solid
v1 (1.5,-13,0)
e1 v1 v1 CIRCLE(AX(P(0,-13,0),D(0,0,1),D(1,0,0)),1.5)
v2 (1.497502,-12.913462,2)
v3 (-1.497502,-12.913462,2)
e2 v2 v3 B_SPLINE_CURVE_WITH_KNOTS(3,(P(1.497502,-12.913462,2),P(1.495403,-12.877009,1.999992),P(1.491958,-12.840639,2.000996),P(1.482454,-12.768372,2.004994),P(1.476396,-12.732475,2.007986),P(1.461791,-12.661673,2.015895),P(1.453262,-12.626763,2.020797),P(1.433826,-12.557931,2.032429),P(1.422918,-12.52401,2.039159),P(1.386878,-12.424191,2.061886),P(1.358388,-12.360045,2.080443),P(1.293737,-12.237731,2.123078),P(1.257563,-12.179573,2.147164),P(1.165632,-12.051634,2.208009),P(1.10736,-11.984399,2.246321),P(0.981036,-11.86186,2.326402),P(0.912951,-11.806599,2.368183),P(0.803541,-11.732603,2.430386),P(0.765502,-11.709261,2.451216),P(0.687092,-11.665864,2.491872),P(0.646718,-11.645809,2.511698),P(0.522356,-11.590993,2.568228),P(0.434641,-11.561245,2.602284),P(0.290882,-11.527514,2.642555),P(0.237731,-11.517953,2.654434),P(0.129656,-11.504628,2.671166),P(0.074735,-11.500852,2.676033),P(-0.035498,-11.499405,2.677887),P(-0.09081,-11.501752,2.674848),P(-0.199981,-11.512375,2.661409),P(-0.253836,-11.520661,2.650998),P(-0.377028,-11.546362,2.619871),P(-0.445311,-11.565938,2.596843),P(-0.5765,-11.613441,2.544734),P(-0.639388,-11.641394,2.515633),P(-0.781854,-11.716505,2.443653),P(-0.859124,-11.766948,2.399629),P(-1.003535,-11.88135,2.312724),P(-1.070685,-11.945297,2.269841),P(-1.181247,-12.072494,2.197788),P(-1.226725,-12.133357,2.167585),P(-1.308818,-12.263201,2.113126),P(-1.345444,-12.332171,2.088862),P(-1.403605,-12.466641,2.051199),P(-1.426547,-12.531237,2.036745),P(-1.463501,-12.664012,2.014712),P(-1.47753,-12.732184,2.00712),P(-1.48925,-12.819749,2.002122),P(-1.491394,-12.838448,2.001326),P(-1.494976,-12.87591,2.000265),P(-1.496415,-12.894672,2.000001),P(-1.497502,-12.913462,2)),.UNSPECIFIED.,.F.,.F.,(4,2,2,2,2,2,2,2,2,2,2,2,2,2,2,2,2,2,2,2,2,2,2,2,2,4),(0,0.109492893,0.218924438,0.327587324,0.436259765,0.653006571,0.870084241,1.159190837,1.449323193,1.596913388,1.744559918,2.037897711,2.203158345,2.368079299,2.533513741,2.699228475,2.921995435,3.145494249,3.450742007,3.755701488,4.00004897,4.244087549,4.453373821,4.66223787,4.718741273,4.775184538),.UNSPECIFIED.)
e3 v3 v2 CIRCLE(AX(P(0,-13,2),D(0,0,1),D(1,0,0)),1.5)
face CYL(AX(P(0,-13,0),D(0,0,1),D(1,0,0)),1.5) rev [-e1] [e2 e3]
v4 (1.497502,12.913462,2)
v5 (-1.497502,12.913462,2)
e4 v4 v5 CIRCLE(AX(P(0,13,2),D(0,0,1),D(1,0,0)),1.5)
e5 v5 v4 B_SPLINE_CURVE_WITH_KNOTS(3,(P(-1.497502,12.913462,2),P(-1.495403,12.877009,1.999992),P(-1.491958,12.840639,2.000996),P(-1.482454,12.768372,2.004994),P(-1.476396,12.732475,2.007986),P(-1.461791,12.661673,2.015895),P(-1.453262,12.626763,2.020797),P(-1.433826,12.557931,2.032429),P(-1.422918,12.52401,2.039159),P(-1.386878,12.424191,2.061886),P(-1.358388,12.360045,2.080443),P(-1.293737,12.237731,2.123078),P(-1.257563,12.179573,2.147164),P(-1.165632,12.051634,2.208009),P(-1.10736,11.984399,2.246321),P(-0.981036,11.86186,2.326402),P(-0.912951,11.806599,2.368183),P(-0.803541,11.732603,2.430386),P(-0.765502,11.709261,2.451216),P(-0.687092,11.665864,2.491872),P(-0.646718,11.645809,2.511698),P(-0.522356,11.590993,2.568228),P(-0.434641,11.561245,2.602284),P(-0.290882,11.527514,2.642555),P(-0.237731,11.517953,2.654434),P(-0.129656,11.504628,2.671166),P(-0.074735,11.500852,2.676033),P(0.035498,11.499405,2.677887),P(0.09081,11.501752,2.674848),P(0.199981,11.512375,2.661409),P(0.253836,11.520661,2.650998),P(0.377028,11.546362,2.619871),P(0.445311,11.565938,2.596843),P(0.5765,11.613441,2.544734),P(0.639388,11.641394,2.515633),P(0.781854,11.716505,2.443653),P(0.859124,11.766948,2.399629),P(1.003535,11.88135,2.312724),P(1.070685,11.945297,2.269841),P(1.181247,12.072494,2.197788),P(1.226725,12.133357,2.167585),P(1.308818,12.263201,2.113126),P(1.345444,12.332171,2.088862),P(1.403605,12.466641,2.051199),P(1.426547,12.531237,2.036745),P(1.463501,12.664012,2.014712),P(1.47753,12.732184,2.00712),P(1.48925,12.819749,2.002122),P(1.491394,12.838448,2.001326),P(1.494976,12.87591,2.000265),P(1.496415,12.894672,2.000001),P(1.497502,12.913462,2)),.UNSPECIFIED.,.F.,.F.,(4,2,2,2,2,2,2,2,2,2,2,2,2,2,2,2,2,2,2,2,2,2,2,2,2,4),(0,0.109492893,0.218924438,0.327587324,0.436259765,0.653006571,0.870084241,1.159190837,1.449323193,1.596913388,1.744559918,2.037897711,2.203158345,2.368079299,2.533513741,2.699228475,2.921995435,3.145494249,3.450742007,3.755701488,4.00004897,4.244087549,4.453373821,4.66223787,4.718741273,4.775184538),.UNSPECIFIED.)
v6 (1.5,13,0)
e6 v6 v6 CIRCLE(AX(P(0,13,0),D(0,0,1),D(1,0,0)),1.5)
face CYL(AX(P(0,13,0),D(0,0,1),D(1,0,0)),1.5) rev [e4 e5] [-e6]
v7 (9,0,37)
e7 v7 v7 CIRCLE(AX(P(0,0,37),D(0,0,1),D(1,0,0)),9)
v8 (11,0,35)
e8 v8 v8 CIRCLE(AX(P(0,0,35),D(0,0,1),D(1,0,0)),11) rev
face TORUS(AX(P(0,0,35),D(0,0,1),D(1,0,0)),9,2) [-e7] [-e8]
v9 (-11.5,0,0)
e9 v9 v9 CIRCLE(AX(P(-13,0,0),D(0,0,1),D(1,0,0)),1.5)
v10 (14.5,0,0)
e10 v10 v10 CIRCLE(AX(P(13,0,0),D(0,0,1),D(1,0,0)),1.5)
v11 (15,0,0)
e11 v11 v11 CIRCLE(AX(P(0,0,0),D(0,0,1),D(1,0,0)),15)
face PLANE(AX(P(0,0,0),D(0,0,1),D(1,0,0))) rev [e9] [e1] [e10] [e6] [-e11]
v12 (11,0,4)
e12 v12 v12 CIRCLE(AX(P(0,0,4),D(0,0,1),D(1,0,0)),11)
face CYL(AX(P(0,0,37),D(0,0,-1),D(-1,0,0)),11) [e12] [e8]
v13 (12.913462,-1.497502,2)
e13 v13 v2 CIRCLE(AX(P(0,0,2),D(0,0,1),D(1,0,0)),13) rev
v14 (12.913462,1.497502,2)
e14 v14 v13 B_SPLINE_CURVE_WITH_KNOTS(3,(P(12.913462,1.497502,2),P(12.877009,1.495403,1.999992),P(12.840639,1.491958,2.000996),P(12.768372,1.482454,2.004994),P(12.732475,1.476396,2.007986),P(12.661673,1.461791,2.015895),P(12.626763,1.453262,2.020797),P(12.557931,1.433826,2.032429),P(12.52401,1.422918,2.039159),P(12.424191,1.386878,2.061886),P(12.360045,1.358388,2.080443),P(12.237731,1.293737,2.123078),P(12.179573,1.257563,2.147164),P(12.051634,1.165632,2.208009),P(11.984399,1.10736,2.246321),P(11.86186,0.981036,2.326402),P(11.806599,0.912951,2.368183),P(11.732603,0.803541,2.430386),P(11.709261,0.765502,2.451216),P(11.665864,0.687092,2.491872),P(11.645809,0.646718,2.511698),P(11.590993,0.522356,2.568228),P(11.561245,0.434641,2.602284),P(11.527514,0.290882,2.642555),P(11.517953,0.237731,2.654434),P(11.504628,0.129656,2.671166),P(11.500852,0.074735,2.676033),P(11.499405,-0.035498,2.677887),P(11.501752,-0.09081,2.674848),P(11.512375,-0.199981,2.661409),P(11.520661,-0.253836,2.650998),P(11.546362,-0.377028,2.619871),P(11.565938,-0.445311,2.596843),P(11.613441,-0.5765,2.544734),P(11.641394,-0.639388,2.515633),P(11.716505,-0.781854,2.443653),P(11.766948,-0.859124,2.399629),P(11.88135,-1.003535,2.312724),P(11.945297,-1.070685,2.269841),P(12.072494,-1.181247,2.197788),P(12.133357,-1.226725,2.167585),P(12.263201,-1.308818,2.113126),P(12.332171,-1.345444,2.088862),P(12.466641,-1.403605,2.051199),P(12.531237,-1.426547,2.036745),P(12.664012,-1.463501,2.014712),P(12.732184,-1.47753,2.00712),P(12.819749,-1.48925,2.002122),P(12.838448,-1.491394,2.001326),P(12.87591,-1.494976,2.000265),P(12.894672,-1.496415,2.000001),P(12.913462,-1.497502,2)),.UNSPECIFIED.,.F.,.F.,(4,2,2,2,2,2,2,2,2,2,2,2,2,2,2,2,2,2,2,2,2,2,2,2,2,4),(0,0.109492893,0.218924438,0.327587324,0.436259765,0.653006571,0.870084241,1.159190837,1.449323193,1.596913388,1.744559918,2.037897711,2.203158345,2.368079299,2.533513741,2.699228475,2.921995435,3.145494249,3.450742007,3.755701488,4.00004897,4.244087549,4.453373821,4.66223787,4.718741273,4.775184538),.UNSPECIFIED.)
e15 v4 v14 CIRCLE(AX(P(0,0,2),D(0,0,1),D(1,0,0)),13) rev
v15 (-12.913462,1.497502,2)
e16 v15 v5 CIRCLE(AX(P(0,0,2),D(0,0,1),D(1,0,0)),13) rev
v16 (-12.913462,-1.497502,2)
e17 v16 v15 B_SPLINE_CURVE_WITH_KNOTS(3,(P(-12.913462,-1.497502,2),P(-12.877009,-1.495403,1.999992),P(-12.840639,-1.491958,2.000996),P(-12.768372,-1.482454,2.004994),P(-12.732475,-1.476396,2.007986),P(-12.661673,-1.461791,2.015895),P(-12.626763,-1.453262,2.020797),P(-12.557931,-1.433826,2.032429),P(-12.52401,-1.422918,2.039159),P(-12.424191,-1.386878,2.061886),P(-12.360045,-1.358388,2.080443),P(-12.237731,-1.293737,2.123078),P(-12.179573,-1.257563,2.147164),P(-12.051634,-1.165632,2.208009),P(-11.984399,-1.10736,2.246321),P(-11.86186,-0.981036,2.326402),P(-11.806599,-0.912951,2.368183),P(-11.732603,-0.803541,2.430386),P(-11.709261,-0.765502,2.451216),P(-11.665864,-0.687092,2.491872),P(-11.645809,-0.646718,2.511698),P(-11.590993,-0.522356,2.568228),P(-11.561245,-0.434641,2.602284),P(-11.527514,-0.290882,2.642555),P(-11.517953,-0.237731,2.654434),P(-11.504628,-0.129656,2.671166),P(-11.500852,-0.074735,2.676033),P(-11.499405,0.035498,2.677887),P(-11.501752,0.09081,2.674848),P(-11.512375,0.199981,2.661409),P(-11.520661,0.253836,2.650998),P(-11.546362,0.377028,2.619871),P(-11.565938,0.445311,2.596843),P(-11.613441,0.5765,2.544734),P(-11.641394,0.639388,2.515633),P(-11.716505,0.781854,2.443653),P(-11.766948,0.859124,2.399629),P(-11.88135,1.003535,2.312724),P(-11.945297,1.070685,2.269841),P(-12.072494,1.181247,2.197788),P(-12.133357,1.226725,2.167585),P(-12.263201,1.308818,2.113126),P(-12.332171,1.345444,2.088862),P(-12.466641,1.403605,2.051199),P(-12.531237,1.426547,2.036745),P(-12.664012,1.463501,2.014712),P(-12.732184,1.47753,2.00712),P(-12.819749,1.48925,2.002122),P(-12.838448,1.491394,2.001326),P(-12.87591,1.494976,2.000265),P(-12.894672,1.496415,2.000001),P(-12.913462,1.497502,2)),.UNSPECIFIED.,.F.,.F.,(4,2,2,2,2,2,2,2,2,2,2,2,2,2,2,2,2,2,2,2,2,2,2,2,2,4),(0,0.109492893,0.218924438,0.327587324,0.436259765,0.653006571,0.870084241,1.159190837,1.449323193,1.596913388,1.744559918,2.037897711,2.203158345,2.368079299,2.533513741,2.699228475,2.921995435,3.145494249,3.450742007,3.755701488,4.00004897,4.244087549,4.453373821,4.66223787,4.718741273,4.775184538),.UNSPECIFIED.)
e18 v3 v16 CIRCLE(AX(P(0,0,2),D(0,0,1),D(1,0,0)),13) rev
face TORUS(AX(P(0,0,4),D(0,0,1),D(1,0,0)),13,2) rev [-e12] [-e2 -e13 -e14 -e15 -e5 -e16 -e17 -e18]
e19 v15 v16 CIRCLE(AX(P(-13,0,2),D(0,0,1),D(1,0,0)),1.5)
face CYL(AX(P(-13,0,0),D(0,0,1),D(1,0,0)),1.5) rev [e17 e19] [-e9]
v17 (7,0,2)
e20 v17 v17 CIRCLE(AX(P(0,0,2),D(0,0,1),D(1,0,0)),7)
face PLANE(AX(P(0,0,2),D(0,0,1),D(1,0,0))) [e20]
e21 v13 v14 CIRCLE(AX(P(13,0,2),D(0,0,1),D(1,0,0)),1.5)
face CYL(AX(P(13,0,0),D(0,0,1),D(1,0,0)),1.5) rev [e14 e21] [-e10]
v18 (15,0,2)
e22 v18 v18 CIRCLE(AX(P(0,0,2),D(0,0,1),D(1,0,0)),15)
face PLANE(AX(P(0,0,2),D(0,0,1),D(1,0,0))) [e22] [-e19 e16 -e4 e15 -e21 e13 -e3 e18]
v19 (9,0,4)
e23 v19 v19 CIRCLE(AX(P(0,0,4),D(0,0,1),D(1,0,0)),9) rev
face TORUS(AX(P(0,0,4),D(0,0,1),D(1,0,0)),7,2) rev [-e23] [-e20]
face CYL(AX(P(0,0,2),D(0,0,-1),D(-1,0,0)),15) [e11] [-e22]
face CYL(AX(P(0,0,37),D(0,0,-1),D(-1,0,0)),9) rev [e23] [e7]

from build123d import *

# Parameters (mm, degrees)
SKETCH1_R           = 15
BOSS_EXTRUDE1_DEPTH = 2
SKETCH2_R           = 11
SKETCH2_R_2         = 9
BOSS_EXTRUDE2_DEPTH = 35
SKETCH3_R           = 1.5
CUT_EXTRUDE1_DEPTH  = 41.926763859
FILLET1_R           = 2
FILLET2_R           = 2


with BuildPart() as part:
    # Sketch1 → Boss-Extrude1 (new body)
    with BuildSketch(Plane.XY):
        Circle(SKETCH1_R)
    extrude(amount=BOSS_EXTRUDE1_DEPTH)

    # Sketch2 → Boss-Extrude2 (add)
    with BuildSketch(Plane.XY.offset(2)):
        Circle(SKETCH2_R)
        Circle(SKETCH2_R_2, mode=Mode.SUBTRACT)
    extrude(amount=BOSS_EXTRUDE2_DEPTH)

    # Sketch3 → Cut-Extrude1 (cut, through all)
    with BuildSketch(Plane.XY.offset(2)):
        with Locations((0, 13)):
            Circle(SKETCH3_R)
        with Locations((13, 0)):
            Circle(SKETCH3_R)
        with Locations((0, -13)):
            Circle(SKETCH3_R)
        with Locations((-13, 0)):
            Circle(SKETCH3_R)
    extrude(amount=-CUT_EXTRUDE1_DEPTH, mode=Mode.SUBTRACT)

    # Fillet1
    # the kernel refuses this fillet: 2 mm, written as the material it adds along each edge
    with BuildSketch(Plane(origin=(0, 0, 2), x_dir=(1, 0, 0), z_dir=(0, -1, 0))) as fillet1_piece_1_section:
        with BuildLine():
            CenterArc((11 + FILLET1_R, FILLET1_R), FILLET1_R, 180, 90)
            Line((11, FILLET1_R), (11, 0))
            Line((11, 0), (11 + FILLET1_R, 0))
        make_face()
    fillet1_piece_1 = revolve(axis=Axis((0, 0, 2), (0, 0, 1)), mode=Mode.PRIVATE)
    fillet1_piece_1 = fillet1_piece_1 - Plane(origin=(-13, 0, 2.02819371), x_dir=(1, 0, 0), z_dir=(0, 0, 1)) * Cylinder(1.5, 52, mode=Mode.PRIVATE)
    fillet1_piece_1 = fillet1_piece_1 - Plane(origin=(0, -13, 2.02819371), x_dir=(1, 0, 0), z_dir=(0, 0, 1)) * Cylinder(1.5, 52, mode=Mode.PRIVATE)
    fillet1_piece_1 = fillet1_piece_1 - Plane(origin=(13, 0, 2.02819371), x_dir=(1, 0, 0), z_dir=(0, 0, 1)) * Cylinder(1.5, 52, mode=Mode.PRIVATE)
    fillet1_piece_1 = fillet1_piece_1 - Plane(origin=(0, 13, 2.02819371), x_dir=(1, 0, 0), z_dir=(0, 0, 1)) * Cylinder(1.5, 52, mode=Mode.PRIVATE)
    add(fillet1_piece_1)
    # the kernel refuses this fillet: 2 mm, written as the material it takes off along each edge
    with BuildSketch(Plane(origin=(0, 0, 37), x_dir=(1, 0, 0), z_dir=(0, -1, 0))) as fillet1_2_piece_1:
        with BuildLine():
            CenterArc((11 - FILLET1_R, -FILLET1_R), FILLET1_R, 0, 90)
            Line((11 - FILLET1_R, 0), (11, 0))
            Line((11, 0), (11, -FILLET1_R))
        make_face()
    revolve(axis=Axis((0, 0, 37), (0, 0, 1)), mode=Mode.SUBTRACT)

    # Fillet2
    fillet2_edges = [part.edges().sort_by_distance(p)[0] for p in [
        (-9, 0, 2),
    ]]
    fillet(fillet2_edges, radius=FILLET2_R)


solid = part.part
